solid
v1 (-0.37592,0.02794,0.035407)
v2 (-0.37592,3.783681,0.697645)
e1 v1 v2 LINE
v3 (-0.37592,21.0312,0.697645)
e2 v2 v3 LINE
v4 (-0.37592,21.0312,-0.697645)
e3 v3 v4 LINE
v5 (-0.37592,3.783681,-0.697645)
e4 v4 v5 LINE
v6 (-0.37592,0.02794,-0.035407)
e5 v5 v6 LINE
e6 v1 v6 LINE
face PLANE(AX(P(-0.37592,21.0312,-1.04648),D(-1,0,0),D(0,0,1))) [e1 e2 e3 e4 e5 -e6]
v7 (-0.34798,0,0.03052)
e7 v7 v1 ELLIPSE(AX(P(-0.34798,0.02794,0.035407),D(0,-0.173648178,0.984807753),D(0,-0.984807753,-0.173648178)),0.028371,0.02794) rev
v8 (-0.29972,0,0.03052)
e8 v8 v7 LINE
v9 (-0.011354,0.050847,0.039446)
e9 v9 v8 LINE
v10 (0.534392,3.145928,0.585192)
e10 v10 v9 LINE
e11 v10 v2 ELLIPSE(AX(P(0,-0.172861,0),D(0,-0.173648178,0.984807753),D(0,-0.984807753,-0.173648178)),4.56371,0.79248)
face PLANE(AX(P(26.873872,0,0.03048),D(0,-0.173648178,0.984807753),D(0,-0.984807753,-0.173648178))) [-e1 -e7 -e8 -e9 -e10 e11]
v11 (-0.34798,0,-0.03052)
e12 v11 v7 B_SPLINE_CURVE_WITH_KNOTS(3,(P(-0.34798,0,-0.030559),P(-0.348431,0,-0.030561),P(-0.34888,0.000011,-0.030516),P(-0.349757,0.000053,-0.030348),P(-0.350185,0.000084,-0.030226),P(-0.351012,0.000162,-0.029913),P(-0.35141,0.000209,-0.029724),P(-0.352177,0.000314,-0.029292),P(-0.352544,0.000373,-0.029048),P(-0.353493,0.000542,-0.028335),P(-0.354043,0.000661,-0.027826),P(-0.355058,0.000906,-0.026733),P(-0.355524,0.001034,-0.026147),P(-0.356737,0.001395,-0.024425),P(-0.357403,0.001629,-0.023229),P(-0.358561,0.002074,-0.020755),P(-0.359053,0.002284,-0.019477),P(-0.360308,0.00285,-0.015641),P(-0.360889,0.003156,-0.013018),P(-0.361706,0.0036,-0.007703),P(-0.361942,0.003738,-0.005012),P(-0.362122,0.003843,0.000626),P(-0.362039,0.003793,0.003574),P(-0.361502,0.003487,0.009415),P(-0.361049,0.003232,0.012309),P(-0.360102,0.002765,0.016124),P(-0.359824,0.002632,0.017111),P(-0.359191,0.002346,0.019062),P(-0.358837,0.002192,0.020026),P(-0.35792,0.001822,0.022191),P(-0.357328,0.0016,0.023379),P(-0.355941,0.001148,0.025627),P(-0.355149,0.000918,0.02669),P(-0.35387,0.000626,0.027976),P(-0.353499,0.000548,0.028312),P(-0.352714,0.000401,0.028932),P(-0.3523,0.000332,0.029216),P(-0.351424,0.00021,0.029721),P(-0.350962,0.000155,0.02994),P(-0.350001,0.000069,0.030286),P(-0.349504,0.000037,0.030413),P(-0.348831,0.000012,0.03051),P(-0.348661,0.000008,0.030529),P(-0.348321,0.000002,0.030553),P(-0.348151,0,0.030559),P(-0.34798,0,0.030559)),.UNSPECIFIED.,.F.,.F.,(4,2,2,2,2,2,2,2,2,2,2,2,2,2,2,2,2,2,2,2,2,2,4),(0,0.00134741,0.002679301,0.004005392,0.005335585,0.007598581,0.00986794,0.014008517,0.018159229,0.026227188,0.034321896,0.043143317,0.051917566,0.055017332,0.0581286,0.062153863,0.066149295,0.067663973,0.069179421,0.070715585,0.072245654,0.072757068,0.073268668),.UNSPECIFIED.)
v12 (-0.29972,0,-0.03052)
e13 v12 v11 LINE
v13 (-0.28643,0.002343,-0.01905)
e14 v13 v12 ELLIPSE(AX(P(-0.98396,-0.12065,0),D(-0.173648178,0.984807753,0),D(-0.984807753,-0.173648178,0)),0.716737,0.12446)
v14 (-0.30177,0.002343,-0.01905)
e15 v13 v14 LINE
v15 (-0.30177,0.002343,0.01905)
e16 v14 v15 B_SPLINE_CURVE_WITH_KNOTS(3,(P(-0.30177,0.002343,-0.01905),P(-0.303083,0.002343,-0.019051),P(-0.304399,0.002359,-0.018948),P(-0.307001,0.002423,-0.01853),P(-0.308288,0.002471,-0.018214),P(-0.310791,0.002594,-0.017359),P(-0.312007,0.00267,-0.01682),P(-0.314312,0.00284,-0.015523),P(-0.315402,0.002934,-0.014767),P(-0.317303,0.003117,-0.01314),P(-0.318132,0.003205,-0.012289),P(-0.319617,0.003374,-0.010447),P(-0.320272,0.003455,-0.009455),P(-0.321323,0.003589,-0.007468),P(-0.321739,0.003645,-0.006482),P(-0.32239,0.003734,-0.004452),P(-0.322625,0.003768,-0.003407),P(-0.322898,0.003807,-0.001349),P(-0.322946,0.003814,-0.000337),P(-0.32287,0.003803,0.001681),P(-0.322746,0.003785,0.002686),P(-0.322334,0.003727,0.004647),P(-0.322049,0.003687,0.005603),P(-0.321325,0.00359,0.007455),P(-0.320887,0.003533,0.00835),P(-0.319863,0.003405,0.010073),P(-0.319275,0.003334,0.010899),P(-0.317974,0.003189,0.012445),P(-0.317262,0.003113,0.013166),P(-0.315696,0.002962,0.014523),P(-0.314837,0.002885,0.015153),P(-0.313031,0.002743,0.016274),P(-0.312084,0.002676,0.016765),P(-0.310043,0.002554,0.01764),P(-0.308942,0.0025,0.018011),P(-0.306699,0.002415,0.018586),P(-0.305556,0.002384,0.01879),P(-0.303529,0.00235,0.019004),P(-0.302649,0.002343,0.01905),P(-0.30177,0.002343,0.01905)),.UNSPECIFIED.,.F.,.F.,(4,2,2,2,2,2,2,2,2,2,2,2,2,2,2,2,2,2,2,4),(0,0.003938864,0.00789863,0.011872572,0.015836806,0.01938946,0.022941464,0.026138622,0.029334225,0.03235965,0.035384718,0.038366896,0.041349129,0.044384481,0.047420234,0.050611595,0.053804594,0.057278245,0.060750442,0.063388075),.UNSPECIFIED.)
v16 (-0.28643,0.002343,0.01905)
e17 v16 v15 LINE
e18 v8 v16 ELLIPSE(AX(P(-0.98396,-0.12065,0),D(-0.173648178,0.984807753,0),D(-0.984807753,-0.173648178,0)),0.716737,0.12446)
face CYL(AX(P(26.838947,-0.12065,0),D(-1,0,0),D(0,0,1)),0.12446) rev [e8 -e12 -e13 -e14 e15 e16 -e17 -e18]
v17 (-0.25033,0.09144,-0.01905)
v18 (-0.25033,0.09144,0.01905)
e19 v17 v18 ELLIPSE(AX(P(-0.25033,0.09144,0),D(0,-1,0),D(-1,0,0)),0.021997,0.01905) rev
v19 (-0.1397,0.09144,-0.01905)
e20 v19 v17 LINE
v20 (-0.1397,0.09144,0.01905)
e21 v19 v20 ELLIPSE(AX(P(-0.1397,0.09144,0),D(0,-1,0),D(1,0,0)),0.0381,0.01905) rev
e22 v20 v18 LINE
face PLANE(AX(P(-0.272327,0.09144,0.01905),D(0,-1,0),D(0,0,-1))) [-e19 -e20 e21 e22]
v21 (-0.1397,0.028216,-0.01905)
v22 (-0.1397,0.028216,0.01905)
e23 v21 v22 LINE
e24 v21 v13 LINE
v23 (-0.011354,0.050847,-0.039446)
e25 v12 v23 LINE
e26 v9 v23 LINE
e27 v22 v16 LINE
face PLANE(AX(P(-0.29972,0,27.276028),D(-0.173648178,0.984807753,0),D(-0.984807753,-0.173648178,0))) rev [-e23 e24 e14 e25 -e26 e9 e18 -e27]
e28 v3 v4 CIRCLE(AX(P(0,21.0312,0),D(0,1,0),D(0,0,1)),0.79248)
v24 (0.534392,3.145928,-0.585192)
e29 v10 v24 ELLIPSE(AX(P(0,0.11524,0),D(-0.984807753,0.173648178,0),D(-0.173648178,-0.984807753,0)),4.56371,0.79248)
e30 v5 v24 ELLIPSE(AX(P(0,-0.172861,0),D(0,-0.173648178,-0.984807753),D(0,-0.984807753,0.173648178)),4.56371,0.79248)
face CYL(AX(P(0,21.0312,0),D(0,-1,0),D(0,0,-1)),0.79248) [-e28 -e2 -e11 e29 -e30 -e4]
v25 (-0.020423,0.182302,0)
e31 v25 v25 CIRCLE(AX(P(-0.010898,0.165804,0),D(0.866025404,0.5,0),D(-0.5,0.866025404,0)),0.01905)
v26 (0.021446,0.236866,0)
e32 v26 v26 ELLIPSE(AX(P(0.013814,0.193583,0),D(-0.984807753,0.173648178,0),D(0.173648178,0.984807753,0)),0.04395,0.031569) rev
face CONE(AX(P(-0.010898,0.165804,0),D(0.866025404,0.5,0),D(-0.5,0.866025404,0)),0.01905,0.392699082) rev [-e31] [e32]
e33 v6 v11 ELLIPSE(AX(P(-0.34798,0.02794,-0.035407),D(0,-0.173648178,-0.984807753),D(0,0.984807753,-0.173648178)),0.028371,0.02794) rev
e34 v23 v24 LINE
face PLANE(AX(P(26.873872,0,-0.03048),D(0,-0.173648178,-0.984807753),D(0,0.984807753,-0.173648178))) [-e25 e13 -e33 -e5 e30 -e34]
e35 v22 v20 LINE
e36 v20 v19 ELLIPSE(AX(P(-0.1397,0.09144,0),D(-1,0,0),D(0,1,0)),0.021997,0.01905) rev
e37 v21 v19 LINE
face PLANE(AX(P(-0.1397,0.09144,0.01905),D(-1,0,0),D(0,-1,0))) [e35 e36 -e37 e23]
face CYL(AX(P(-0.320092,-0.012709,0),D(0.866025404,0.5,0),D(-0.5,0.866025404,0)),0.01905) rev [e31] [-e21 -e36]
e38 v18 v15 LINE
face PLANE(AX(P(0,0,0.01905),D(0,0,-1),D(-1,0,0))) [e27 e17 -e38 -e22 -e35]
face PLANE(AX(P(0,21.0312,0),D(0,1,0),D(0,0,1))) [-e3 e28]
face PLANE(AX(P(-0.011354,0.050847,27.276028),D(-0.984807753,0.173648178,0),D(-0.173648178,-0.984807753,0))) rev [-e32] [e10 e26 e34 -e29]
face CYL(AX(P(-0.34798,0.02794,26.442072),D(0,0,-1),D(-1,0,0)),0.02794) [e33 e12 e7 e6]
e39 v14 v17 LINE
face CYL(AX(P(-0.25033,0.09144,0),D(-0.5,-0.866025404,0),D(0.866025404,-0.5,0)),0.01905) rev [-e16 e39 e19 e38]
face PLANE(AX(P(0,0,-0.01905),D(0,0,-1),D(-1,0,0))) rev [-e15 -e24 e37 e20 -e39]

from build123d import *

# Parameters (mm, degrees)
TD_SKETCH_R                             = 0.79248
TL_FEATURE_DEPTH                        = 21.0312
TDF_STD_SKETCH_W                        = 2.09296
TDF_STD_SKETCH_H                        = 2.09296
TDF_STD_FEATURE_DEPTH                   = 22.061040395
ISA_20_STD_FEATURE_DEPTH                = 22.061040395
ISA_20_STD_FEATURE_DEPTH_BACK           = 22.061040395
F_10BA_STD_FEATURE_DEPTH                = 22.061040395
F_10BA_STD_FEATURE_DEPTH_BACK           = 22.061040395
FRO_STD_FEATURE_DEPTH                   = 22.061040395
FRO_STD_FEATURE_DEPTH_BACK              = 22.061040395
C_STD_FEATURE_DEPTH                     = 22.061040395
C_STD_FEATURE_DEPTH_BACK                = 22.061040395
ERW_STD_FEATURE_DEPTH                   = 0.01905
H_STD_FEATURE_REACH                     = 22.896
H_STD_SKETCH_R                          = 0.01905
H_STD_SKETCH_3_R                        = 0.01905
FUNNEL_FINAL_DIAMETRE_STD_FEATURE_DEPTH = 2.499995
FUNNEL_FINAL_DIAMETRE_STD_FEATURE_DRAFT = -22.5
ROUND_BR_STD_FEATURE_START              = -1
ROUND_BR_STD_FEATURE_DEPTH              = 1.009339363


with BuildPart() as part:
    # TD_sketch → TL_feature (new body)
    with BuildSketch(Plane(origin=(0, 0, 0), x_dir=(1, 0, 0), z_dir=(0, 1, 0))):
        with Locations(Location((0, 0, 0), (0, 0, 270))):
            Circle(TD_SKETCH_R)
    extrude(amount=TL_FEATURE_DEPTH)

    # TDF_STD_sketch → TDF_STD_feature (cut, through all)
    with BuildSketch(Plane(origin=(0, 0, 0), x_dir=(1, 0, 0), z_dir=(0, 1, 0))):
        with Locations((-1.4224, 0)):
            Rectangle(TDF_STD_SKETCH_W, TDF_STD_SKETCH_H)
    extrude(amount=TDF_STD_FEATURE_DEPTH, mode=Mode.SUBTRACT)

    # ISA_20_STD_sketch → ISA_20_STD_feature (cut, two sides: drawn at the far end of the back side and taken through both)
    with BuildSketch(Plane(origin=(0, 0, 0), x_dir=(0, 0, -1), z_dir=(1, 0, 0)).offset(-ISA_20_STD_FEATURE_DEPTH_BACK)):
        Polygon((-12.946999885, 73.253224398), (-3.738847997, 21.0312), (-0.03048, 0), (0.03048, 0), (3.738847997, 21.0312), (12.946999885, 73.253224398), (12.946999885, -32.802042202), (-12.946999885, -32.802042202), align=None)
    extrude(amount=ISA_20_STD_FEATURE_DEPTH + ISA_20_STD_FEATURE_DEPTH_BACK, mode=Mode.SUBTRACT)

    # 10BA_STD_sketch → 10BA_STD_feature (cut, two sides: drawn at the far end of the back side and taken through both)
    with BuildSketch(Plane.XY.offset(-F_10BA_STD_FEATURE_DEPTH_BACK)):
        Polygon((-53.216424634, 0), (-0.37592, 0), (-0.29972, 0), (-0.011354365, 0.050846642), (3.688047997, 21.0312), (12.863705333, 73.068938636), (91.245889802, 2.18375769), (25.165759835, -70.885180946), align=None)
    extrude(amount=F_10BA_STD_FEATURE_DEPTH + F_10BA_STD_FEATURE_DEPTH_BACK, mode=Mode.SUBTRACT)

    # FRO_STD_sketch → FRO_STD_feature (cut, two sides: drawn at the far end of the back side and taken through both)
    with BuildSketch(Plane.XY.offset(-FRO_STD_FEATURE_DEPTH_BACK)):
        with BuildLine():
            Line((-0.37592, 52.152138388), (-0.37592, 0.02794))
            ThreePointArc((-0.37592, 0.02794), (-0.367736563, 0.008183437), (-0.34798, 0))
            Line((-0.34798, 0), (51.776218388, 0))
            Line((51.776218388, 0), (-21.9385299, -73.714748288))
            Line((-21.9385299, -73.714748288), (-74.090668288, -21.5626099))
            Line((-74.090668288, -21.5626099), (-0.37592, 52.152138388))
        make_face()
    extrude(amount=FRO_STD_FEATURE_DEPTH + FRO_STD_FEATURE_DEPTH_BACK, mode=Mode.SUBTRACT)

    # C_STD_sketch → C_STD_feature (cut, two sides: drawn at the far end of the back side and taken through both)
    with BuildSketch(Plane(origin=(0, 0, 0), x_dir=(0, 0, -1), z_dir=(1, 0, 0)).offset(-C_STD_FEATURE_DEPTH_BACK)):
        with BuildLine():
            Line((-50.530423385, -12.791040855), (-0.030559272, 0))
            ThreePointArc((-0.030559272, 0), (0, 0.00381), (0.030559272, 0))
            Line((0.030559272, 0), (50.530423385, -12.791040855))
            Line((50.530423385, -12.791040855), (50.530423385, -116.980234183))
            Line((50.530423385, -116.980234183), (-50.530423385, -116.980234183))
            Line((-50.530423385, -116.980234183), (-50.530423385, -12.791040855))
        make_face()
    extrude(amount=C_STD_FEATURE_DEPTH + C_STD_FEATURE_DEPTH_BACK, mode=Mode.SUBTRACT)


with BuildPart() as body_2:
    # ERW_STD_sketch → ERW_STD_feature (new, symmetric)
    with BuildSketch(Plane.XY):
        Polygon((-0.1397, 0.09144), (-0.1397, 0), (-0.32512, 0), (-0.272327091, 0.09144), align=None)
    extrude(amount=ERW_STD_FEATURE_DEPTH, both=True)

    # H_STD_sketch → H_STD_feature (add, up to next)
    with BuildSketch(Plane(origin=(-0.010897713, 0.165804035, 0), x_dir=(0, 0, -1), z_dir=(0.8660254037844415, 0.4999999999999953, 0)), mode=Mode.PRIVATE) as h_std_feature_sk1:
        with Locations(Location((0, 0, 0), (0, 0, 90))):
            Circle(H_STD_SKETCH_R)
    h_std_feature_tool1 = extrude(h_std_feature_sk1.sketch, amount=-H_STD_FEATURE_REACH, mode=Mode.PRIVATE) - body_2.part
    add(h_std_feature_tool1.solids().sort_by_distance((-0.010898, 0.165804, 0))[0])


with BuildPart() as funnel_final_diametre_std_feature_tool:
    # H_STD_sketch<3> → funnel_final_diametre_STD_feature (with draft: the straight prism first)
    with BuildSketch(Plane(origin=(-0.010897713, 0.165804035, 0), x_dir=(0, 0, -1), z_dir=(0.8660254037844415, 0.4999999999999953, 0))):
        with Locations(Location((0, 0, 0), (0, 0, 90))):
            Circle(H_STD_SKETCH_3_R)
    extrude(amount=FUNNEL_FINAL_DIAMETRE_STD_FEATURE_DEPTH)
    # funnel_final_diametre_STD_feature: the draft: its side faces are tilted about the plane it starts from
    funnel_final_diametre_std_feature_sides = [funnel_final_diametre_std_feature_tool.faces().sort_by_distance(p)[0] for p in [
        (1.081156877, 0.774305001, 0),
    ]]
    draft(funnel_final_diametre_std_feature_sides, Plane(origin=(-0.010897713, 0.165804035, 0), x_dir=(0, 0, -1), z_dir=(0.8660254037844415, 0.4999999999999953, 0)), FUNNEL_FINAL_DIAMETRE_STD_FEATURE_DRAFT)


with BuildPart() as body_2_1:
    add(body_2.part)

    # funnel_final_diametre_STD_feature: add funnel_final_diametre_std_feature_tool
    add(funnel_final_diametre_std_feature_tool.part)

    # ROUND_BR_STD_feature: read off the stored shape, not the designer's step
    # ROUND_BR_STD_feature outline → ROUND_BR_STD_feature (cut)
    with BuildSketch(Plane(origin=(0, 0, 0), x_dir=(0.8660254037844362, -0.5000000000000042, 0), z_dir=(0.5000000000000042, 0.8660254037844363, 0)).offset(ROUND_BR_STD_FEATURE_START)):
        with BuildLine():
            Line((-0.281562179, -0.01905), (-0.262512179, -0.01905))
            ThreePointArc((-0.262512179, -0.01905), (-0.275982563, -0.013470384), (-0.281562179, 0))
            Line((-0.281562179, 0), (-0.281562179, -0.01905))
        make_face()
        with BuildLine():
            Line((-0.281562179, 0.01905), (-0.281562179, 0))
            ThreePointArc((-0.281562179, 0), (-0.275982563, 0.013470384), (-0.262512179, 0.01905))
            Line((-0.262512179, 0.01905), (-0.281562179, 0.01905))
        make_face()
    extrude(amount=ROUND_BR_STD_FEATURE_DEPTH, mode=Mode.SUBTRACT)


with BuildPart() as part_1:
    add(part.part)

    # COMBINE_STD_feature: cut body 2
    add(body_2_1.part, mode=Mode.SUBTRACT)


solid = part_1.part
